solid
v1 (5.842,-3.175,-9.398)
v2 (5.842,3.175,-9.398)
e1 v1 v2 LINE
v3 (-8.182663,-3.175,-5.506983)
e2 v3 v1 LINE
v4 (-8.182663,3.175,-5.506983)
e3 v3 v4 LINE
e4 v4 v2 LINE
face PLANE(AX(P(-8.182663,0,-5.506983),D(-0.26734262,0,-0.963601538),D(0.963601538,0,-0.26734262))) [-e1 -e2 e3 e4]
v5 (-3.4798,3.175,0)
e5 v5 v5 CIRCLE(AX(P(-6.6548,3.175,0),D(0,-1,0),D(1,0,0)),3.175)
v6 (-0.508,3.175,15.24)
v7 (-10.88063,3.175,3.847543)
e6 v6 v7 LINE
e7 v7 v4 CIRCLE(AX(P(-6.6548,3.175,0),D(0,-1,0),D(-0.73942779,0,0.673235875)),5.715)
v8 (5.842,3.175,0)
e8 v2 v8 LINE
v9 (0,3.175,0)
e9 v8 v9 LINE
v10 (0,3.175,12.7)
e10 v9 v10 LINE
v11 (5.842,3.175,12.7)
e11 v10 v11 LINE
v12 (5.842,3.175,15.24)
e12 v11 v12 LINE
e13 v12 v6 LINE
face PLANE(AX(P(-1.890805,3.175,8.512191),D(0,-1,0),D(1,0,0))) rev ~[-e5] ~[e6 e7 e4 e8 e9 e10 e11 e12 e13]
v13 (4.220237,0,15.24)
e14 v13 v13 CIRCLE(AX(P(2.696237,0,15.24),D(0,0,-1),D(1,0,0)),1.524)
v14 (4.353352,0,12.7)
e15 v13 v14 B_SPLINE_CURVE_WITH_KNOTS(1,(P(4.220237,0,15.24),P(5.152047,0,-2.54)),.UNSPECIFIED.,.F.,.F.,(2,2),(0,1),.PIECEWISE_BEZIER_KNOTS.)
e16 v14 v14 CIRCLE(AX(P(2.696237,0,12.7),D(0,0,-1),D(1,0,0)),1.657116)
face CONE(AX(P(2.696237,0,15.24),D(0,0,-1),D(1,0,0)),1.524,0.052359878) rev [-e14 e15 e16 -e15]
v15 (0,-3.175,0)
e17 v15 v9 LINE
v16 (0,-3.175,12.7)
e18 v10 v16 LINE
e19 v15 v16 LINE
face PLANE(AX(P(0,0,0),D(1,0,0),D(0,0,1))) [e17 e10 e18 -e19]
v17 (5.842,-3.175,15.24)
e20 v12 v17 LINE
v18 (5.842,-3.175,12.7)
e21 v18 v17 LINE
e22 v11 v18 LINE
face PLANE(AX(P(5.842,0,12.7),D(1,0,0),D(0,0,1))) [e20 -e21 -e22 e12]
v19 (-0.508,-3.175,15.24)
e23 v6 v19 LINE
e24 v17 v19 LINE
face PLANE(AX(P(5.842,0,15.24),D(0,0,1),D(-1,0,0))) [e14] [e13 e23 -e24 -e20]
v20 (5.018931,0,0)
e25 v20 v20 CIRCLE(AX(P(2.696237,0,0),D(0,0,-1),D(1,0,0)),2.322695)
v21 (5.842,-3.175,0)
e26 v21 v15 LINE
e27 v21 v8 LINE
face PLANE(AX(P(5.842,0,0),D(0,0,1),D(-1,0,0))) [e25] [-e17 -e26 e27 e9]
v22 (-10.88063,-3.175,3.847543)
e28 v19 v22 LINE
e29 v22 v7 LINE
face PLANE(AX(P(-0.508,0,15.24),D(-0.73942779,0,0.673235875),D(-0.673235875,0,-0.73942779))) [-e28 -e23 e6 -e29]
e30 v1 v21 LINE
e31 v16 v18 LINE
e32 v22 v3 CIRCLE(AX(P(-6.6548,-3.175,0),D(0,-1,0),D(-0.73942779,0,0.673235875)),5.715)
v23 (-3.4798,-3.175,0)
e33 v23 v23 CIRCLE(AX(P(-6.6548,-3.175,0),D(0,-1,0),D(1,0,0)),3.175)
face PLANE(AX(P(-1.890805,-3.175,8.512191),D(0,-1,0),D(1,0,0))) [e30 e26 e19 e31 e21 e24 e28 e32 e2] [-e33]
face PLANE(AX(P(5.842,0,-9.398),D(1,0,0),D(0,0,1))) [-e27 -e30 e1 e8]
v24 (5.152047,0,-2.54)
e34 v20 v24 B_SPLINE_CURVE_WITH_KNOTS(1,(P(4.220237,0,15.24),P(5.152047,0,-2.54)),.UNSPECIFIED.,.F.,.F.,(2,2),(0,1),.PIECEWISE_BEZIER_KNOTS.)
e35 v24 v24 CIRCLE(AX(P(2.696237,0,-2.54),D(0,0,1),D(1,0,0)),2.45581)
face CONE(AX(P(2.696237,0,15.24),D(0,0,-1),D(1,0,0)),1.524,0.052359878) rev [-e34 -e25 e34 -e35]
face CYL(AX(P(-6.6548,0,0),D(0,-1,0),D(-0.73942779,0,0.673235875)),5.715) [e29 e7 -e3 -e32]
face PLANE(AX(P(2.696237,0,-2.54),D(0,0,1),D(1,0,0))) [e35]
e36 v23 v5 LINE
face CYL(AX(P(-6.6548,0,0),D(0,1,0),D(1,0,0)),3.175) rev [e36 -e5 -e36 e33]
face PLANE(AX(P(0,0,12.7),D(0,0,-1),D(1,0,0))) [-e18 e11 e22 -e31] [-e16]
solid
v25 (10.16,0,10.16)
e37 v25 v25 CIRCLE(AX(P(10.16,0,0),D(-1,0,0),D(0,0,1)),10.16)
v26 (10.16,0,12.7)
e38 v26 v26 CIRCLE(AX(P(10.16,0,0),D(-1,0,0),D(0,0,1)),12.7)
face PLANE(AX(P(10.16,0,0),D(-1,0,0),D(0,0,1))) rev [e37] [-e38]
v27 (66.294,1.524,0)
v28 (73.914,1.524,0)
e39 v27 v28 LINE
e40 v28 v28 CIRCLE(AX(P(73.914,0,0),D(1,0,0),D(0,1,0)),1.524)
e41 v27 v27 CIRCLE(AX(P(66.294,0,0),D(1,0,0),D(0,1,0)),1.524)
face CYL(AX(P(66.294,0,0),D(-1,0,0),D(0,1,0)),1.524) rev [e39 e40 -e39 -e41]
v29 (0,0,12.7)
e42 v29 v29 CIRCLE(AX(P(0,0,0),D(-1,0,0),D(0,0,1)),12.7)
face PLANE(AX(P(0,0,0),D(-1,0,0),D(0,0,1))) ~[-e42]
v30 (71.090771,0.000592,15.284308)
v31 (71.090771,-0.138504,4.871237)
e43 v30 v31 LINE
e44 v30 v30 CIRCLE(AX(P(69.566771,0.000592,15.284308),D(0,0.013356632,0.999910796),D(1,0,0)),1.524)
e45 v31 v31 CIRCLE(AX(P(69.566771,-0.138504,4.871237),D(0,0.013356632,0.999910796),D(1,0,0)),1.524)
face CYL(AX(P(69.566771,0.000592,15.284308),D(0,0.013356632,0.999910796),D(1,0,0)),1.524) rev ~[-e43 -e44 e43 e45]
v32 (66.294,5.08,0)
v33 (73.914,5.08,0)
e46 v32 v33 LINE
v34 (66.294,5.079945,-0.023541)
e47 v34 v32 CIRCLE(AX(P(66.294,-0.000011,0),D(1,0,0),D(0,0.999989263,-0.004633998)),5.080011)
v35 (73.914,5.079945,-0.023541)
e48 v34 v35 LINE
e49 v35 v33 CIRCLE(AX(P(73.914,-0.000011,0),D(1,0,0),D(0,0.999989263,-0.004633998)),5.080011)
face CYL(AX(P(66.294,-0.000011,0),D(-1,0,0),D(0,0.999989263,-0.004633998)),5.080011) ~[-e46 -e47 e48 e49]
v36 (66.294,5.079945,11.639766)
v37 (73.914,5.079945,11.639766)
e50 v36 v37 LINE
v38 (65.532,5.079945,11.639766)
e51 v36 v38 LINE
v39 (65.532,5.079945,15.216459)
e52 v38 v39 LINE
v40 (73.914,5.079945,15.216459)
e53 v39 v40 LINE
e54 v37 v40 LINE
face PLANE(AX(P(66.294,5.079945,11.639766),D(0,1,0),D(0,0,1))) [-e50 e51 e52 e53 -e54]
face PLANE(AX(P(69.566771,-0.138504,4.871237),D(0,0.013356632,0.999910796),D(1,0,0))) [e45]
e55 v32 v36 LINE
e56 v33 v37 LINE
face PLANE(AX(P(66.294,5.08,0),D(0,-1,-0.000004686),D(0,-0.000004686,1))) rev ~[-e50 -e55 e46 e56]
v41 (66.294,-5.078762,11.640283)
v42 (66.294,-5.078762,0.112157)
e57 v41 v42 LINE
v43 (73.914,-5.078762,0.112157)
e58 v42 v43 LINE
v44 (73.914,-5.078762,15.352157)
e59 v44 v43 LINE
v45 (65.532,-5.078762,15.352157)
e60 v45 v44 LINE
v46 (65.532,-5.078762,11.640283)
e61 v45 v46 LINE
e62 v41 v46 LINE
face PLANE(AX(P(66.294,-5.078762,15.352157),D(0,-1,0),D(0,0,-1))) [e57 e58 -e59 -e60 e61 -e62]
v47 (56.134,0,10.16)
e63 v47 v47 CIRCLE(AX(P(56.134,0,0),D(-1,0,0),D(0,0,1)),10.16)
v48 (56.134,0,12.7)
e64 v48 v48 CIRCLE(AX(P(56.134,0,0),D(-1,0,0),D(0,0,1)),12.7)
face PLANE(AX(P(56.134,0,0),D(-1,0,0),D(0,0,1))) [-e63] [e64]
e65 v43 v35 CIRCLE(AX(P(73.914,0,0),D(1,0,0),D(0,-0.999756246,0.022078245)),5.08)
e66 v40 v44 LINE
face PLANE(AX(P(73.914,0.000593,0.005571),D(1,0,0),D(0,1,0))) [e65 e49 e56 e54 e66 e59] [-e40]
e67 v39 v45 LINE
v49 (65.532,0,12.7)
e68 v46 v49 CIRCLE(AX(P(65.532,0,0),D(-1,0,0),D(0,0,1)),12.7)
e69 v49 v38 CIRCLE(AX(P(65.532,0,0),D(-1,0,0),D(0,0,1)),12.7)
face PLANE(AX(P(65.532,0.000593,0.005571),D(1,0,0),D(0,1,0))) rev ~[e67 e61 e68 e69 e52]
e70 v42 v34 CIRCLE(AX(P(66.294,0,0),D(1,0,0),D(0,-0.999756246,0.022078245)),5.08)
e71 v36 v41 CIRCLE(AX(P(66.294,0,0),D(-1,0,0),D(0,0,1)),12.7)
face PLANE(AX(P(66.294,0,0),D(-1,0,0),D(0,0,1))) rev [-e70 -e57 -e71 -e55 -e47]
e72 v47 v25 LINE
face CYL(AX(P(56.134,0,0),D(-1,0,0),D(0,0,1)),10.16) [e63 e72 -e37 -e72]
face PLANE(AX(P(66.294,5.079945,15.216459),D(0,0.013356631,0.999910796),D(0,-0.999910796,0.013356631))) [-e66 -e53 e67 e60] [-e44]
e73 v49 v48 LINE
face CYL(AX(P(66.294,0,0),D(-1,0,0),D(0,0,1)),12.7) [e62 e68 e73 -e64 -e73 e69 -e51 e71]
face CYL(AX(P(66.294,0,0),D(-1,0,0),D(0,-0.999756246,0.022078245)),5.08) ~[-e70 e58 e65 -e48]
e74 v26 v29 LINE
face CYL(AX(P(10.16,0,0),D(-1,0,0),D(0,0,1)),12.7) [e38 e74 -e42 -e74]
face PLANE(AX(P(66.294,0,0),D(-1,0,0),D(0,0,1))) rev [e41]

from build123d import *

# Parameters (mm, degrees)
F0_W          = 5.842
F0_H          = 12.7
F0_R          = 3.175
F2_DEPTH      = 3.175
F3_R          = 1.524
F4_DEPTH      = 7.62
F4_DEPTH_BACK = 0.762
F5_R          = 1.524
F6_DEPTH      = 17.78
F6_TAPER      = -3
F7_R          = 1.524
F8_DEPTH      = 10.414


# Not quite as in the source:
# - ends of sketch curves that miss each other by under 0.0002 mm in the source are joined


with BuildPart() as f1:
    # F0 (on Front) → F1 (revolve)
    with BuildSketch(Plane.XZ):
        Polygon((5.842, 12.7), (5.842, 0), (66.294, 0), (66.294, 12.7), (56.134, 12.7), (56.134, 10.16), (10.16, 10.16), (10.16, 12.7), align=None)
        with Locations((2.921, 6.35)):
            Rectangle(F0_W, F0_H)
    revolve(axis=Axis((33.147, 0, 0), (-1, 0, 0)))

    # F3 (on face) → F4 (join, two sides)
    with BuildSketch(Plane.YZ.offset(66.294)) as f4_sk:
        with BuildLine():
            ThreePointArc((5.0799454558, -0.0235407301), (5.0799863639, -0.0117703966), (5.08, 0))
            ThreePointArc((5.08, 0), (0.056082159, 5.0796904228), (-5.0787617289, 0.1121574827))
            ThreePointArc((-5.0787617289, 0.1121574827), (-0.0678516878, -5.0795468448), (5.0799454558, -0.0235407301))
        make_face()
        Circle(F3_R, mode=Mode.SUBTRACT)
        with BuildLine():
            ThreePointArc((-5.0787617289, 11.6402826126), (0.0006457603, 12.6999999836), (5.0799454558, 11.6397660701))
            Line((5.0799454558, 11.6397660701), (5.0799454558, 15.2164592699))
            Line((5.0799454558, 15.2164592699), (-5.0787617289, 15.3521574827))
            Line((-5.0787617289, 15.3521574827), (-5.0787617289, 11.6402826126))
        make_face()
        with BuildLine():
            ThreePointArc((-5.0787617289, 0.1121574827), (0.056082159, 5.0796904228), (5.08, 0))
            Line((5.08, 0), (5.0799454558, 11.6397660701))
            ThreePointArc((5.0799454558, 11.6397660701), (0.0006457603, 12.6999999836), (-5.0787617289, 11.6402826126))
            Line((-5.0787617289, 11.6402826126), (-5.0787617289, 0.1121574827))
        make_face()
    extrude(amount=F4_DEPTH)
    extrude(f4_sk.sketch, amount=-F4_DEPTH_BACK)

    # F7 (on face) → F8 (cut)
    with BuildSketch(Plane(origin=(0, 0.2041287691, 15.2815895663), x_dir=(1, 0, 0), z_dir=(0, 0.0133566315, 0.9999107962))):
        with Locations((69.5667713881, -0.2035550635)):
            Circle(F7_R)
    extrude(amount=-F8_DEPTH, mode=Mode.SUBTRACT)


with BuildPart() as f2:
    # F0 (on Front) → F2 (new body, symmetric)
    with BuildSketch(Plane.XZ):
        with BuildLine():
            Line((-0.9398, 0), (0, 0))
            Line((0, 0), (0, 12.7))
            Line((0, 12.7), (5.842, 12.7))
            Line((5.842, 12.7), (5.842, 15.24))
            Line((5.842, 15.24), (-0.508, 15.24))
            Line((-0.508, 15.24), (-10.8806298187, 3.8475430269))
            ThreePointArc((-10.8806298187, 3.8475430269), (-4.5919612295, 5.3297205562), (-0.9398, 0))
        make_face()
        with BuildLine():
            Line((5.842, 0), (0, 0))
            Line((0, 0), (-0.9398, 0))
            ThreePointArc((-0.9398, 0), (-3.1957909266, -4.5493385486), (-8.1826630726, -5.5069827884))
            Line((-8.1826630726, -5.5069827884), (5.842, -9.398))
            Line((5.842, -9.398), (5.842, 0))
        make_face()
        with BuildLine():
            ThreePointArc((-8.1826630726, -5.5069827884), (-3.1957909266, -4.5493385486), (-0.9398, 0))
            ThreePointArc((-0.9398, 0), (-4.5919612295, 5.3297205562), (-10.8806298187, 3.8475430269))
            ThreePointArc((-10.8806298187, 3.8475430269), (-12.1459778134, -1.5837270034), (-8.1826630726, -5.5069827884))
        make_face()
        with Locations((-6.6548, 0)):
            Circle(F0_R, mode=Mode.SUBTRACT)
    extrude(amount=F2_DEPTH, both=True)

    # F5 (on face) → F6 (cut)
    with BuildSketch(Plane.XY.offset(15.24)):
        with Locations((2.6962365955, 0)):
            Circle(F5_R)
    extrude(amount=-F6_DEPTH, taper=F6_TAPER, mode=Mode.SUBTRACT)


solid = Compound([f1.part, f2.part])
